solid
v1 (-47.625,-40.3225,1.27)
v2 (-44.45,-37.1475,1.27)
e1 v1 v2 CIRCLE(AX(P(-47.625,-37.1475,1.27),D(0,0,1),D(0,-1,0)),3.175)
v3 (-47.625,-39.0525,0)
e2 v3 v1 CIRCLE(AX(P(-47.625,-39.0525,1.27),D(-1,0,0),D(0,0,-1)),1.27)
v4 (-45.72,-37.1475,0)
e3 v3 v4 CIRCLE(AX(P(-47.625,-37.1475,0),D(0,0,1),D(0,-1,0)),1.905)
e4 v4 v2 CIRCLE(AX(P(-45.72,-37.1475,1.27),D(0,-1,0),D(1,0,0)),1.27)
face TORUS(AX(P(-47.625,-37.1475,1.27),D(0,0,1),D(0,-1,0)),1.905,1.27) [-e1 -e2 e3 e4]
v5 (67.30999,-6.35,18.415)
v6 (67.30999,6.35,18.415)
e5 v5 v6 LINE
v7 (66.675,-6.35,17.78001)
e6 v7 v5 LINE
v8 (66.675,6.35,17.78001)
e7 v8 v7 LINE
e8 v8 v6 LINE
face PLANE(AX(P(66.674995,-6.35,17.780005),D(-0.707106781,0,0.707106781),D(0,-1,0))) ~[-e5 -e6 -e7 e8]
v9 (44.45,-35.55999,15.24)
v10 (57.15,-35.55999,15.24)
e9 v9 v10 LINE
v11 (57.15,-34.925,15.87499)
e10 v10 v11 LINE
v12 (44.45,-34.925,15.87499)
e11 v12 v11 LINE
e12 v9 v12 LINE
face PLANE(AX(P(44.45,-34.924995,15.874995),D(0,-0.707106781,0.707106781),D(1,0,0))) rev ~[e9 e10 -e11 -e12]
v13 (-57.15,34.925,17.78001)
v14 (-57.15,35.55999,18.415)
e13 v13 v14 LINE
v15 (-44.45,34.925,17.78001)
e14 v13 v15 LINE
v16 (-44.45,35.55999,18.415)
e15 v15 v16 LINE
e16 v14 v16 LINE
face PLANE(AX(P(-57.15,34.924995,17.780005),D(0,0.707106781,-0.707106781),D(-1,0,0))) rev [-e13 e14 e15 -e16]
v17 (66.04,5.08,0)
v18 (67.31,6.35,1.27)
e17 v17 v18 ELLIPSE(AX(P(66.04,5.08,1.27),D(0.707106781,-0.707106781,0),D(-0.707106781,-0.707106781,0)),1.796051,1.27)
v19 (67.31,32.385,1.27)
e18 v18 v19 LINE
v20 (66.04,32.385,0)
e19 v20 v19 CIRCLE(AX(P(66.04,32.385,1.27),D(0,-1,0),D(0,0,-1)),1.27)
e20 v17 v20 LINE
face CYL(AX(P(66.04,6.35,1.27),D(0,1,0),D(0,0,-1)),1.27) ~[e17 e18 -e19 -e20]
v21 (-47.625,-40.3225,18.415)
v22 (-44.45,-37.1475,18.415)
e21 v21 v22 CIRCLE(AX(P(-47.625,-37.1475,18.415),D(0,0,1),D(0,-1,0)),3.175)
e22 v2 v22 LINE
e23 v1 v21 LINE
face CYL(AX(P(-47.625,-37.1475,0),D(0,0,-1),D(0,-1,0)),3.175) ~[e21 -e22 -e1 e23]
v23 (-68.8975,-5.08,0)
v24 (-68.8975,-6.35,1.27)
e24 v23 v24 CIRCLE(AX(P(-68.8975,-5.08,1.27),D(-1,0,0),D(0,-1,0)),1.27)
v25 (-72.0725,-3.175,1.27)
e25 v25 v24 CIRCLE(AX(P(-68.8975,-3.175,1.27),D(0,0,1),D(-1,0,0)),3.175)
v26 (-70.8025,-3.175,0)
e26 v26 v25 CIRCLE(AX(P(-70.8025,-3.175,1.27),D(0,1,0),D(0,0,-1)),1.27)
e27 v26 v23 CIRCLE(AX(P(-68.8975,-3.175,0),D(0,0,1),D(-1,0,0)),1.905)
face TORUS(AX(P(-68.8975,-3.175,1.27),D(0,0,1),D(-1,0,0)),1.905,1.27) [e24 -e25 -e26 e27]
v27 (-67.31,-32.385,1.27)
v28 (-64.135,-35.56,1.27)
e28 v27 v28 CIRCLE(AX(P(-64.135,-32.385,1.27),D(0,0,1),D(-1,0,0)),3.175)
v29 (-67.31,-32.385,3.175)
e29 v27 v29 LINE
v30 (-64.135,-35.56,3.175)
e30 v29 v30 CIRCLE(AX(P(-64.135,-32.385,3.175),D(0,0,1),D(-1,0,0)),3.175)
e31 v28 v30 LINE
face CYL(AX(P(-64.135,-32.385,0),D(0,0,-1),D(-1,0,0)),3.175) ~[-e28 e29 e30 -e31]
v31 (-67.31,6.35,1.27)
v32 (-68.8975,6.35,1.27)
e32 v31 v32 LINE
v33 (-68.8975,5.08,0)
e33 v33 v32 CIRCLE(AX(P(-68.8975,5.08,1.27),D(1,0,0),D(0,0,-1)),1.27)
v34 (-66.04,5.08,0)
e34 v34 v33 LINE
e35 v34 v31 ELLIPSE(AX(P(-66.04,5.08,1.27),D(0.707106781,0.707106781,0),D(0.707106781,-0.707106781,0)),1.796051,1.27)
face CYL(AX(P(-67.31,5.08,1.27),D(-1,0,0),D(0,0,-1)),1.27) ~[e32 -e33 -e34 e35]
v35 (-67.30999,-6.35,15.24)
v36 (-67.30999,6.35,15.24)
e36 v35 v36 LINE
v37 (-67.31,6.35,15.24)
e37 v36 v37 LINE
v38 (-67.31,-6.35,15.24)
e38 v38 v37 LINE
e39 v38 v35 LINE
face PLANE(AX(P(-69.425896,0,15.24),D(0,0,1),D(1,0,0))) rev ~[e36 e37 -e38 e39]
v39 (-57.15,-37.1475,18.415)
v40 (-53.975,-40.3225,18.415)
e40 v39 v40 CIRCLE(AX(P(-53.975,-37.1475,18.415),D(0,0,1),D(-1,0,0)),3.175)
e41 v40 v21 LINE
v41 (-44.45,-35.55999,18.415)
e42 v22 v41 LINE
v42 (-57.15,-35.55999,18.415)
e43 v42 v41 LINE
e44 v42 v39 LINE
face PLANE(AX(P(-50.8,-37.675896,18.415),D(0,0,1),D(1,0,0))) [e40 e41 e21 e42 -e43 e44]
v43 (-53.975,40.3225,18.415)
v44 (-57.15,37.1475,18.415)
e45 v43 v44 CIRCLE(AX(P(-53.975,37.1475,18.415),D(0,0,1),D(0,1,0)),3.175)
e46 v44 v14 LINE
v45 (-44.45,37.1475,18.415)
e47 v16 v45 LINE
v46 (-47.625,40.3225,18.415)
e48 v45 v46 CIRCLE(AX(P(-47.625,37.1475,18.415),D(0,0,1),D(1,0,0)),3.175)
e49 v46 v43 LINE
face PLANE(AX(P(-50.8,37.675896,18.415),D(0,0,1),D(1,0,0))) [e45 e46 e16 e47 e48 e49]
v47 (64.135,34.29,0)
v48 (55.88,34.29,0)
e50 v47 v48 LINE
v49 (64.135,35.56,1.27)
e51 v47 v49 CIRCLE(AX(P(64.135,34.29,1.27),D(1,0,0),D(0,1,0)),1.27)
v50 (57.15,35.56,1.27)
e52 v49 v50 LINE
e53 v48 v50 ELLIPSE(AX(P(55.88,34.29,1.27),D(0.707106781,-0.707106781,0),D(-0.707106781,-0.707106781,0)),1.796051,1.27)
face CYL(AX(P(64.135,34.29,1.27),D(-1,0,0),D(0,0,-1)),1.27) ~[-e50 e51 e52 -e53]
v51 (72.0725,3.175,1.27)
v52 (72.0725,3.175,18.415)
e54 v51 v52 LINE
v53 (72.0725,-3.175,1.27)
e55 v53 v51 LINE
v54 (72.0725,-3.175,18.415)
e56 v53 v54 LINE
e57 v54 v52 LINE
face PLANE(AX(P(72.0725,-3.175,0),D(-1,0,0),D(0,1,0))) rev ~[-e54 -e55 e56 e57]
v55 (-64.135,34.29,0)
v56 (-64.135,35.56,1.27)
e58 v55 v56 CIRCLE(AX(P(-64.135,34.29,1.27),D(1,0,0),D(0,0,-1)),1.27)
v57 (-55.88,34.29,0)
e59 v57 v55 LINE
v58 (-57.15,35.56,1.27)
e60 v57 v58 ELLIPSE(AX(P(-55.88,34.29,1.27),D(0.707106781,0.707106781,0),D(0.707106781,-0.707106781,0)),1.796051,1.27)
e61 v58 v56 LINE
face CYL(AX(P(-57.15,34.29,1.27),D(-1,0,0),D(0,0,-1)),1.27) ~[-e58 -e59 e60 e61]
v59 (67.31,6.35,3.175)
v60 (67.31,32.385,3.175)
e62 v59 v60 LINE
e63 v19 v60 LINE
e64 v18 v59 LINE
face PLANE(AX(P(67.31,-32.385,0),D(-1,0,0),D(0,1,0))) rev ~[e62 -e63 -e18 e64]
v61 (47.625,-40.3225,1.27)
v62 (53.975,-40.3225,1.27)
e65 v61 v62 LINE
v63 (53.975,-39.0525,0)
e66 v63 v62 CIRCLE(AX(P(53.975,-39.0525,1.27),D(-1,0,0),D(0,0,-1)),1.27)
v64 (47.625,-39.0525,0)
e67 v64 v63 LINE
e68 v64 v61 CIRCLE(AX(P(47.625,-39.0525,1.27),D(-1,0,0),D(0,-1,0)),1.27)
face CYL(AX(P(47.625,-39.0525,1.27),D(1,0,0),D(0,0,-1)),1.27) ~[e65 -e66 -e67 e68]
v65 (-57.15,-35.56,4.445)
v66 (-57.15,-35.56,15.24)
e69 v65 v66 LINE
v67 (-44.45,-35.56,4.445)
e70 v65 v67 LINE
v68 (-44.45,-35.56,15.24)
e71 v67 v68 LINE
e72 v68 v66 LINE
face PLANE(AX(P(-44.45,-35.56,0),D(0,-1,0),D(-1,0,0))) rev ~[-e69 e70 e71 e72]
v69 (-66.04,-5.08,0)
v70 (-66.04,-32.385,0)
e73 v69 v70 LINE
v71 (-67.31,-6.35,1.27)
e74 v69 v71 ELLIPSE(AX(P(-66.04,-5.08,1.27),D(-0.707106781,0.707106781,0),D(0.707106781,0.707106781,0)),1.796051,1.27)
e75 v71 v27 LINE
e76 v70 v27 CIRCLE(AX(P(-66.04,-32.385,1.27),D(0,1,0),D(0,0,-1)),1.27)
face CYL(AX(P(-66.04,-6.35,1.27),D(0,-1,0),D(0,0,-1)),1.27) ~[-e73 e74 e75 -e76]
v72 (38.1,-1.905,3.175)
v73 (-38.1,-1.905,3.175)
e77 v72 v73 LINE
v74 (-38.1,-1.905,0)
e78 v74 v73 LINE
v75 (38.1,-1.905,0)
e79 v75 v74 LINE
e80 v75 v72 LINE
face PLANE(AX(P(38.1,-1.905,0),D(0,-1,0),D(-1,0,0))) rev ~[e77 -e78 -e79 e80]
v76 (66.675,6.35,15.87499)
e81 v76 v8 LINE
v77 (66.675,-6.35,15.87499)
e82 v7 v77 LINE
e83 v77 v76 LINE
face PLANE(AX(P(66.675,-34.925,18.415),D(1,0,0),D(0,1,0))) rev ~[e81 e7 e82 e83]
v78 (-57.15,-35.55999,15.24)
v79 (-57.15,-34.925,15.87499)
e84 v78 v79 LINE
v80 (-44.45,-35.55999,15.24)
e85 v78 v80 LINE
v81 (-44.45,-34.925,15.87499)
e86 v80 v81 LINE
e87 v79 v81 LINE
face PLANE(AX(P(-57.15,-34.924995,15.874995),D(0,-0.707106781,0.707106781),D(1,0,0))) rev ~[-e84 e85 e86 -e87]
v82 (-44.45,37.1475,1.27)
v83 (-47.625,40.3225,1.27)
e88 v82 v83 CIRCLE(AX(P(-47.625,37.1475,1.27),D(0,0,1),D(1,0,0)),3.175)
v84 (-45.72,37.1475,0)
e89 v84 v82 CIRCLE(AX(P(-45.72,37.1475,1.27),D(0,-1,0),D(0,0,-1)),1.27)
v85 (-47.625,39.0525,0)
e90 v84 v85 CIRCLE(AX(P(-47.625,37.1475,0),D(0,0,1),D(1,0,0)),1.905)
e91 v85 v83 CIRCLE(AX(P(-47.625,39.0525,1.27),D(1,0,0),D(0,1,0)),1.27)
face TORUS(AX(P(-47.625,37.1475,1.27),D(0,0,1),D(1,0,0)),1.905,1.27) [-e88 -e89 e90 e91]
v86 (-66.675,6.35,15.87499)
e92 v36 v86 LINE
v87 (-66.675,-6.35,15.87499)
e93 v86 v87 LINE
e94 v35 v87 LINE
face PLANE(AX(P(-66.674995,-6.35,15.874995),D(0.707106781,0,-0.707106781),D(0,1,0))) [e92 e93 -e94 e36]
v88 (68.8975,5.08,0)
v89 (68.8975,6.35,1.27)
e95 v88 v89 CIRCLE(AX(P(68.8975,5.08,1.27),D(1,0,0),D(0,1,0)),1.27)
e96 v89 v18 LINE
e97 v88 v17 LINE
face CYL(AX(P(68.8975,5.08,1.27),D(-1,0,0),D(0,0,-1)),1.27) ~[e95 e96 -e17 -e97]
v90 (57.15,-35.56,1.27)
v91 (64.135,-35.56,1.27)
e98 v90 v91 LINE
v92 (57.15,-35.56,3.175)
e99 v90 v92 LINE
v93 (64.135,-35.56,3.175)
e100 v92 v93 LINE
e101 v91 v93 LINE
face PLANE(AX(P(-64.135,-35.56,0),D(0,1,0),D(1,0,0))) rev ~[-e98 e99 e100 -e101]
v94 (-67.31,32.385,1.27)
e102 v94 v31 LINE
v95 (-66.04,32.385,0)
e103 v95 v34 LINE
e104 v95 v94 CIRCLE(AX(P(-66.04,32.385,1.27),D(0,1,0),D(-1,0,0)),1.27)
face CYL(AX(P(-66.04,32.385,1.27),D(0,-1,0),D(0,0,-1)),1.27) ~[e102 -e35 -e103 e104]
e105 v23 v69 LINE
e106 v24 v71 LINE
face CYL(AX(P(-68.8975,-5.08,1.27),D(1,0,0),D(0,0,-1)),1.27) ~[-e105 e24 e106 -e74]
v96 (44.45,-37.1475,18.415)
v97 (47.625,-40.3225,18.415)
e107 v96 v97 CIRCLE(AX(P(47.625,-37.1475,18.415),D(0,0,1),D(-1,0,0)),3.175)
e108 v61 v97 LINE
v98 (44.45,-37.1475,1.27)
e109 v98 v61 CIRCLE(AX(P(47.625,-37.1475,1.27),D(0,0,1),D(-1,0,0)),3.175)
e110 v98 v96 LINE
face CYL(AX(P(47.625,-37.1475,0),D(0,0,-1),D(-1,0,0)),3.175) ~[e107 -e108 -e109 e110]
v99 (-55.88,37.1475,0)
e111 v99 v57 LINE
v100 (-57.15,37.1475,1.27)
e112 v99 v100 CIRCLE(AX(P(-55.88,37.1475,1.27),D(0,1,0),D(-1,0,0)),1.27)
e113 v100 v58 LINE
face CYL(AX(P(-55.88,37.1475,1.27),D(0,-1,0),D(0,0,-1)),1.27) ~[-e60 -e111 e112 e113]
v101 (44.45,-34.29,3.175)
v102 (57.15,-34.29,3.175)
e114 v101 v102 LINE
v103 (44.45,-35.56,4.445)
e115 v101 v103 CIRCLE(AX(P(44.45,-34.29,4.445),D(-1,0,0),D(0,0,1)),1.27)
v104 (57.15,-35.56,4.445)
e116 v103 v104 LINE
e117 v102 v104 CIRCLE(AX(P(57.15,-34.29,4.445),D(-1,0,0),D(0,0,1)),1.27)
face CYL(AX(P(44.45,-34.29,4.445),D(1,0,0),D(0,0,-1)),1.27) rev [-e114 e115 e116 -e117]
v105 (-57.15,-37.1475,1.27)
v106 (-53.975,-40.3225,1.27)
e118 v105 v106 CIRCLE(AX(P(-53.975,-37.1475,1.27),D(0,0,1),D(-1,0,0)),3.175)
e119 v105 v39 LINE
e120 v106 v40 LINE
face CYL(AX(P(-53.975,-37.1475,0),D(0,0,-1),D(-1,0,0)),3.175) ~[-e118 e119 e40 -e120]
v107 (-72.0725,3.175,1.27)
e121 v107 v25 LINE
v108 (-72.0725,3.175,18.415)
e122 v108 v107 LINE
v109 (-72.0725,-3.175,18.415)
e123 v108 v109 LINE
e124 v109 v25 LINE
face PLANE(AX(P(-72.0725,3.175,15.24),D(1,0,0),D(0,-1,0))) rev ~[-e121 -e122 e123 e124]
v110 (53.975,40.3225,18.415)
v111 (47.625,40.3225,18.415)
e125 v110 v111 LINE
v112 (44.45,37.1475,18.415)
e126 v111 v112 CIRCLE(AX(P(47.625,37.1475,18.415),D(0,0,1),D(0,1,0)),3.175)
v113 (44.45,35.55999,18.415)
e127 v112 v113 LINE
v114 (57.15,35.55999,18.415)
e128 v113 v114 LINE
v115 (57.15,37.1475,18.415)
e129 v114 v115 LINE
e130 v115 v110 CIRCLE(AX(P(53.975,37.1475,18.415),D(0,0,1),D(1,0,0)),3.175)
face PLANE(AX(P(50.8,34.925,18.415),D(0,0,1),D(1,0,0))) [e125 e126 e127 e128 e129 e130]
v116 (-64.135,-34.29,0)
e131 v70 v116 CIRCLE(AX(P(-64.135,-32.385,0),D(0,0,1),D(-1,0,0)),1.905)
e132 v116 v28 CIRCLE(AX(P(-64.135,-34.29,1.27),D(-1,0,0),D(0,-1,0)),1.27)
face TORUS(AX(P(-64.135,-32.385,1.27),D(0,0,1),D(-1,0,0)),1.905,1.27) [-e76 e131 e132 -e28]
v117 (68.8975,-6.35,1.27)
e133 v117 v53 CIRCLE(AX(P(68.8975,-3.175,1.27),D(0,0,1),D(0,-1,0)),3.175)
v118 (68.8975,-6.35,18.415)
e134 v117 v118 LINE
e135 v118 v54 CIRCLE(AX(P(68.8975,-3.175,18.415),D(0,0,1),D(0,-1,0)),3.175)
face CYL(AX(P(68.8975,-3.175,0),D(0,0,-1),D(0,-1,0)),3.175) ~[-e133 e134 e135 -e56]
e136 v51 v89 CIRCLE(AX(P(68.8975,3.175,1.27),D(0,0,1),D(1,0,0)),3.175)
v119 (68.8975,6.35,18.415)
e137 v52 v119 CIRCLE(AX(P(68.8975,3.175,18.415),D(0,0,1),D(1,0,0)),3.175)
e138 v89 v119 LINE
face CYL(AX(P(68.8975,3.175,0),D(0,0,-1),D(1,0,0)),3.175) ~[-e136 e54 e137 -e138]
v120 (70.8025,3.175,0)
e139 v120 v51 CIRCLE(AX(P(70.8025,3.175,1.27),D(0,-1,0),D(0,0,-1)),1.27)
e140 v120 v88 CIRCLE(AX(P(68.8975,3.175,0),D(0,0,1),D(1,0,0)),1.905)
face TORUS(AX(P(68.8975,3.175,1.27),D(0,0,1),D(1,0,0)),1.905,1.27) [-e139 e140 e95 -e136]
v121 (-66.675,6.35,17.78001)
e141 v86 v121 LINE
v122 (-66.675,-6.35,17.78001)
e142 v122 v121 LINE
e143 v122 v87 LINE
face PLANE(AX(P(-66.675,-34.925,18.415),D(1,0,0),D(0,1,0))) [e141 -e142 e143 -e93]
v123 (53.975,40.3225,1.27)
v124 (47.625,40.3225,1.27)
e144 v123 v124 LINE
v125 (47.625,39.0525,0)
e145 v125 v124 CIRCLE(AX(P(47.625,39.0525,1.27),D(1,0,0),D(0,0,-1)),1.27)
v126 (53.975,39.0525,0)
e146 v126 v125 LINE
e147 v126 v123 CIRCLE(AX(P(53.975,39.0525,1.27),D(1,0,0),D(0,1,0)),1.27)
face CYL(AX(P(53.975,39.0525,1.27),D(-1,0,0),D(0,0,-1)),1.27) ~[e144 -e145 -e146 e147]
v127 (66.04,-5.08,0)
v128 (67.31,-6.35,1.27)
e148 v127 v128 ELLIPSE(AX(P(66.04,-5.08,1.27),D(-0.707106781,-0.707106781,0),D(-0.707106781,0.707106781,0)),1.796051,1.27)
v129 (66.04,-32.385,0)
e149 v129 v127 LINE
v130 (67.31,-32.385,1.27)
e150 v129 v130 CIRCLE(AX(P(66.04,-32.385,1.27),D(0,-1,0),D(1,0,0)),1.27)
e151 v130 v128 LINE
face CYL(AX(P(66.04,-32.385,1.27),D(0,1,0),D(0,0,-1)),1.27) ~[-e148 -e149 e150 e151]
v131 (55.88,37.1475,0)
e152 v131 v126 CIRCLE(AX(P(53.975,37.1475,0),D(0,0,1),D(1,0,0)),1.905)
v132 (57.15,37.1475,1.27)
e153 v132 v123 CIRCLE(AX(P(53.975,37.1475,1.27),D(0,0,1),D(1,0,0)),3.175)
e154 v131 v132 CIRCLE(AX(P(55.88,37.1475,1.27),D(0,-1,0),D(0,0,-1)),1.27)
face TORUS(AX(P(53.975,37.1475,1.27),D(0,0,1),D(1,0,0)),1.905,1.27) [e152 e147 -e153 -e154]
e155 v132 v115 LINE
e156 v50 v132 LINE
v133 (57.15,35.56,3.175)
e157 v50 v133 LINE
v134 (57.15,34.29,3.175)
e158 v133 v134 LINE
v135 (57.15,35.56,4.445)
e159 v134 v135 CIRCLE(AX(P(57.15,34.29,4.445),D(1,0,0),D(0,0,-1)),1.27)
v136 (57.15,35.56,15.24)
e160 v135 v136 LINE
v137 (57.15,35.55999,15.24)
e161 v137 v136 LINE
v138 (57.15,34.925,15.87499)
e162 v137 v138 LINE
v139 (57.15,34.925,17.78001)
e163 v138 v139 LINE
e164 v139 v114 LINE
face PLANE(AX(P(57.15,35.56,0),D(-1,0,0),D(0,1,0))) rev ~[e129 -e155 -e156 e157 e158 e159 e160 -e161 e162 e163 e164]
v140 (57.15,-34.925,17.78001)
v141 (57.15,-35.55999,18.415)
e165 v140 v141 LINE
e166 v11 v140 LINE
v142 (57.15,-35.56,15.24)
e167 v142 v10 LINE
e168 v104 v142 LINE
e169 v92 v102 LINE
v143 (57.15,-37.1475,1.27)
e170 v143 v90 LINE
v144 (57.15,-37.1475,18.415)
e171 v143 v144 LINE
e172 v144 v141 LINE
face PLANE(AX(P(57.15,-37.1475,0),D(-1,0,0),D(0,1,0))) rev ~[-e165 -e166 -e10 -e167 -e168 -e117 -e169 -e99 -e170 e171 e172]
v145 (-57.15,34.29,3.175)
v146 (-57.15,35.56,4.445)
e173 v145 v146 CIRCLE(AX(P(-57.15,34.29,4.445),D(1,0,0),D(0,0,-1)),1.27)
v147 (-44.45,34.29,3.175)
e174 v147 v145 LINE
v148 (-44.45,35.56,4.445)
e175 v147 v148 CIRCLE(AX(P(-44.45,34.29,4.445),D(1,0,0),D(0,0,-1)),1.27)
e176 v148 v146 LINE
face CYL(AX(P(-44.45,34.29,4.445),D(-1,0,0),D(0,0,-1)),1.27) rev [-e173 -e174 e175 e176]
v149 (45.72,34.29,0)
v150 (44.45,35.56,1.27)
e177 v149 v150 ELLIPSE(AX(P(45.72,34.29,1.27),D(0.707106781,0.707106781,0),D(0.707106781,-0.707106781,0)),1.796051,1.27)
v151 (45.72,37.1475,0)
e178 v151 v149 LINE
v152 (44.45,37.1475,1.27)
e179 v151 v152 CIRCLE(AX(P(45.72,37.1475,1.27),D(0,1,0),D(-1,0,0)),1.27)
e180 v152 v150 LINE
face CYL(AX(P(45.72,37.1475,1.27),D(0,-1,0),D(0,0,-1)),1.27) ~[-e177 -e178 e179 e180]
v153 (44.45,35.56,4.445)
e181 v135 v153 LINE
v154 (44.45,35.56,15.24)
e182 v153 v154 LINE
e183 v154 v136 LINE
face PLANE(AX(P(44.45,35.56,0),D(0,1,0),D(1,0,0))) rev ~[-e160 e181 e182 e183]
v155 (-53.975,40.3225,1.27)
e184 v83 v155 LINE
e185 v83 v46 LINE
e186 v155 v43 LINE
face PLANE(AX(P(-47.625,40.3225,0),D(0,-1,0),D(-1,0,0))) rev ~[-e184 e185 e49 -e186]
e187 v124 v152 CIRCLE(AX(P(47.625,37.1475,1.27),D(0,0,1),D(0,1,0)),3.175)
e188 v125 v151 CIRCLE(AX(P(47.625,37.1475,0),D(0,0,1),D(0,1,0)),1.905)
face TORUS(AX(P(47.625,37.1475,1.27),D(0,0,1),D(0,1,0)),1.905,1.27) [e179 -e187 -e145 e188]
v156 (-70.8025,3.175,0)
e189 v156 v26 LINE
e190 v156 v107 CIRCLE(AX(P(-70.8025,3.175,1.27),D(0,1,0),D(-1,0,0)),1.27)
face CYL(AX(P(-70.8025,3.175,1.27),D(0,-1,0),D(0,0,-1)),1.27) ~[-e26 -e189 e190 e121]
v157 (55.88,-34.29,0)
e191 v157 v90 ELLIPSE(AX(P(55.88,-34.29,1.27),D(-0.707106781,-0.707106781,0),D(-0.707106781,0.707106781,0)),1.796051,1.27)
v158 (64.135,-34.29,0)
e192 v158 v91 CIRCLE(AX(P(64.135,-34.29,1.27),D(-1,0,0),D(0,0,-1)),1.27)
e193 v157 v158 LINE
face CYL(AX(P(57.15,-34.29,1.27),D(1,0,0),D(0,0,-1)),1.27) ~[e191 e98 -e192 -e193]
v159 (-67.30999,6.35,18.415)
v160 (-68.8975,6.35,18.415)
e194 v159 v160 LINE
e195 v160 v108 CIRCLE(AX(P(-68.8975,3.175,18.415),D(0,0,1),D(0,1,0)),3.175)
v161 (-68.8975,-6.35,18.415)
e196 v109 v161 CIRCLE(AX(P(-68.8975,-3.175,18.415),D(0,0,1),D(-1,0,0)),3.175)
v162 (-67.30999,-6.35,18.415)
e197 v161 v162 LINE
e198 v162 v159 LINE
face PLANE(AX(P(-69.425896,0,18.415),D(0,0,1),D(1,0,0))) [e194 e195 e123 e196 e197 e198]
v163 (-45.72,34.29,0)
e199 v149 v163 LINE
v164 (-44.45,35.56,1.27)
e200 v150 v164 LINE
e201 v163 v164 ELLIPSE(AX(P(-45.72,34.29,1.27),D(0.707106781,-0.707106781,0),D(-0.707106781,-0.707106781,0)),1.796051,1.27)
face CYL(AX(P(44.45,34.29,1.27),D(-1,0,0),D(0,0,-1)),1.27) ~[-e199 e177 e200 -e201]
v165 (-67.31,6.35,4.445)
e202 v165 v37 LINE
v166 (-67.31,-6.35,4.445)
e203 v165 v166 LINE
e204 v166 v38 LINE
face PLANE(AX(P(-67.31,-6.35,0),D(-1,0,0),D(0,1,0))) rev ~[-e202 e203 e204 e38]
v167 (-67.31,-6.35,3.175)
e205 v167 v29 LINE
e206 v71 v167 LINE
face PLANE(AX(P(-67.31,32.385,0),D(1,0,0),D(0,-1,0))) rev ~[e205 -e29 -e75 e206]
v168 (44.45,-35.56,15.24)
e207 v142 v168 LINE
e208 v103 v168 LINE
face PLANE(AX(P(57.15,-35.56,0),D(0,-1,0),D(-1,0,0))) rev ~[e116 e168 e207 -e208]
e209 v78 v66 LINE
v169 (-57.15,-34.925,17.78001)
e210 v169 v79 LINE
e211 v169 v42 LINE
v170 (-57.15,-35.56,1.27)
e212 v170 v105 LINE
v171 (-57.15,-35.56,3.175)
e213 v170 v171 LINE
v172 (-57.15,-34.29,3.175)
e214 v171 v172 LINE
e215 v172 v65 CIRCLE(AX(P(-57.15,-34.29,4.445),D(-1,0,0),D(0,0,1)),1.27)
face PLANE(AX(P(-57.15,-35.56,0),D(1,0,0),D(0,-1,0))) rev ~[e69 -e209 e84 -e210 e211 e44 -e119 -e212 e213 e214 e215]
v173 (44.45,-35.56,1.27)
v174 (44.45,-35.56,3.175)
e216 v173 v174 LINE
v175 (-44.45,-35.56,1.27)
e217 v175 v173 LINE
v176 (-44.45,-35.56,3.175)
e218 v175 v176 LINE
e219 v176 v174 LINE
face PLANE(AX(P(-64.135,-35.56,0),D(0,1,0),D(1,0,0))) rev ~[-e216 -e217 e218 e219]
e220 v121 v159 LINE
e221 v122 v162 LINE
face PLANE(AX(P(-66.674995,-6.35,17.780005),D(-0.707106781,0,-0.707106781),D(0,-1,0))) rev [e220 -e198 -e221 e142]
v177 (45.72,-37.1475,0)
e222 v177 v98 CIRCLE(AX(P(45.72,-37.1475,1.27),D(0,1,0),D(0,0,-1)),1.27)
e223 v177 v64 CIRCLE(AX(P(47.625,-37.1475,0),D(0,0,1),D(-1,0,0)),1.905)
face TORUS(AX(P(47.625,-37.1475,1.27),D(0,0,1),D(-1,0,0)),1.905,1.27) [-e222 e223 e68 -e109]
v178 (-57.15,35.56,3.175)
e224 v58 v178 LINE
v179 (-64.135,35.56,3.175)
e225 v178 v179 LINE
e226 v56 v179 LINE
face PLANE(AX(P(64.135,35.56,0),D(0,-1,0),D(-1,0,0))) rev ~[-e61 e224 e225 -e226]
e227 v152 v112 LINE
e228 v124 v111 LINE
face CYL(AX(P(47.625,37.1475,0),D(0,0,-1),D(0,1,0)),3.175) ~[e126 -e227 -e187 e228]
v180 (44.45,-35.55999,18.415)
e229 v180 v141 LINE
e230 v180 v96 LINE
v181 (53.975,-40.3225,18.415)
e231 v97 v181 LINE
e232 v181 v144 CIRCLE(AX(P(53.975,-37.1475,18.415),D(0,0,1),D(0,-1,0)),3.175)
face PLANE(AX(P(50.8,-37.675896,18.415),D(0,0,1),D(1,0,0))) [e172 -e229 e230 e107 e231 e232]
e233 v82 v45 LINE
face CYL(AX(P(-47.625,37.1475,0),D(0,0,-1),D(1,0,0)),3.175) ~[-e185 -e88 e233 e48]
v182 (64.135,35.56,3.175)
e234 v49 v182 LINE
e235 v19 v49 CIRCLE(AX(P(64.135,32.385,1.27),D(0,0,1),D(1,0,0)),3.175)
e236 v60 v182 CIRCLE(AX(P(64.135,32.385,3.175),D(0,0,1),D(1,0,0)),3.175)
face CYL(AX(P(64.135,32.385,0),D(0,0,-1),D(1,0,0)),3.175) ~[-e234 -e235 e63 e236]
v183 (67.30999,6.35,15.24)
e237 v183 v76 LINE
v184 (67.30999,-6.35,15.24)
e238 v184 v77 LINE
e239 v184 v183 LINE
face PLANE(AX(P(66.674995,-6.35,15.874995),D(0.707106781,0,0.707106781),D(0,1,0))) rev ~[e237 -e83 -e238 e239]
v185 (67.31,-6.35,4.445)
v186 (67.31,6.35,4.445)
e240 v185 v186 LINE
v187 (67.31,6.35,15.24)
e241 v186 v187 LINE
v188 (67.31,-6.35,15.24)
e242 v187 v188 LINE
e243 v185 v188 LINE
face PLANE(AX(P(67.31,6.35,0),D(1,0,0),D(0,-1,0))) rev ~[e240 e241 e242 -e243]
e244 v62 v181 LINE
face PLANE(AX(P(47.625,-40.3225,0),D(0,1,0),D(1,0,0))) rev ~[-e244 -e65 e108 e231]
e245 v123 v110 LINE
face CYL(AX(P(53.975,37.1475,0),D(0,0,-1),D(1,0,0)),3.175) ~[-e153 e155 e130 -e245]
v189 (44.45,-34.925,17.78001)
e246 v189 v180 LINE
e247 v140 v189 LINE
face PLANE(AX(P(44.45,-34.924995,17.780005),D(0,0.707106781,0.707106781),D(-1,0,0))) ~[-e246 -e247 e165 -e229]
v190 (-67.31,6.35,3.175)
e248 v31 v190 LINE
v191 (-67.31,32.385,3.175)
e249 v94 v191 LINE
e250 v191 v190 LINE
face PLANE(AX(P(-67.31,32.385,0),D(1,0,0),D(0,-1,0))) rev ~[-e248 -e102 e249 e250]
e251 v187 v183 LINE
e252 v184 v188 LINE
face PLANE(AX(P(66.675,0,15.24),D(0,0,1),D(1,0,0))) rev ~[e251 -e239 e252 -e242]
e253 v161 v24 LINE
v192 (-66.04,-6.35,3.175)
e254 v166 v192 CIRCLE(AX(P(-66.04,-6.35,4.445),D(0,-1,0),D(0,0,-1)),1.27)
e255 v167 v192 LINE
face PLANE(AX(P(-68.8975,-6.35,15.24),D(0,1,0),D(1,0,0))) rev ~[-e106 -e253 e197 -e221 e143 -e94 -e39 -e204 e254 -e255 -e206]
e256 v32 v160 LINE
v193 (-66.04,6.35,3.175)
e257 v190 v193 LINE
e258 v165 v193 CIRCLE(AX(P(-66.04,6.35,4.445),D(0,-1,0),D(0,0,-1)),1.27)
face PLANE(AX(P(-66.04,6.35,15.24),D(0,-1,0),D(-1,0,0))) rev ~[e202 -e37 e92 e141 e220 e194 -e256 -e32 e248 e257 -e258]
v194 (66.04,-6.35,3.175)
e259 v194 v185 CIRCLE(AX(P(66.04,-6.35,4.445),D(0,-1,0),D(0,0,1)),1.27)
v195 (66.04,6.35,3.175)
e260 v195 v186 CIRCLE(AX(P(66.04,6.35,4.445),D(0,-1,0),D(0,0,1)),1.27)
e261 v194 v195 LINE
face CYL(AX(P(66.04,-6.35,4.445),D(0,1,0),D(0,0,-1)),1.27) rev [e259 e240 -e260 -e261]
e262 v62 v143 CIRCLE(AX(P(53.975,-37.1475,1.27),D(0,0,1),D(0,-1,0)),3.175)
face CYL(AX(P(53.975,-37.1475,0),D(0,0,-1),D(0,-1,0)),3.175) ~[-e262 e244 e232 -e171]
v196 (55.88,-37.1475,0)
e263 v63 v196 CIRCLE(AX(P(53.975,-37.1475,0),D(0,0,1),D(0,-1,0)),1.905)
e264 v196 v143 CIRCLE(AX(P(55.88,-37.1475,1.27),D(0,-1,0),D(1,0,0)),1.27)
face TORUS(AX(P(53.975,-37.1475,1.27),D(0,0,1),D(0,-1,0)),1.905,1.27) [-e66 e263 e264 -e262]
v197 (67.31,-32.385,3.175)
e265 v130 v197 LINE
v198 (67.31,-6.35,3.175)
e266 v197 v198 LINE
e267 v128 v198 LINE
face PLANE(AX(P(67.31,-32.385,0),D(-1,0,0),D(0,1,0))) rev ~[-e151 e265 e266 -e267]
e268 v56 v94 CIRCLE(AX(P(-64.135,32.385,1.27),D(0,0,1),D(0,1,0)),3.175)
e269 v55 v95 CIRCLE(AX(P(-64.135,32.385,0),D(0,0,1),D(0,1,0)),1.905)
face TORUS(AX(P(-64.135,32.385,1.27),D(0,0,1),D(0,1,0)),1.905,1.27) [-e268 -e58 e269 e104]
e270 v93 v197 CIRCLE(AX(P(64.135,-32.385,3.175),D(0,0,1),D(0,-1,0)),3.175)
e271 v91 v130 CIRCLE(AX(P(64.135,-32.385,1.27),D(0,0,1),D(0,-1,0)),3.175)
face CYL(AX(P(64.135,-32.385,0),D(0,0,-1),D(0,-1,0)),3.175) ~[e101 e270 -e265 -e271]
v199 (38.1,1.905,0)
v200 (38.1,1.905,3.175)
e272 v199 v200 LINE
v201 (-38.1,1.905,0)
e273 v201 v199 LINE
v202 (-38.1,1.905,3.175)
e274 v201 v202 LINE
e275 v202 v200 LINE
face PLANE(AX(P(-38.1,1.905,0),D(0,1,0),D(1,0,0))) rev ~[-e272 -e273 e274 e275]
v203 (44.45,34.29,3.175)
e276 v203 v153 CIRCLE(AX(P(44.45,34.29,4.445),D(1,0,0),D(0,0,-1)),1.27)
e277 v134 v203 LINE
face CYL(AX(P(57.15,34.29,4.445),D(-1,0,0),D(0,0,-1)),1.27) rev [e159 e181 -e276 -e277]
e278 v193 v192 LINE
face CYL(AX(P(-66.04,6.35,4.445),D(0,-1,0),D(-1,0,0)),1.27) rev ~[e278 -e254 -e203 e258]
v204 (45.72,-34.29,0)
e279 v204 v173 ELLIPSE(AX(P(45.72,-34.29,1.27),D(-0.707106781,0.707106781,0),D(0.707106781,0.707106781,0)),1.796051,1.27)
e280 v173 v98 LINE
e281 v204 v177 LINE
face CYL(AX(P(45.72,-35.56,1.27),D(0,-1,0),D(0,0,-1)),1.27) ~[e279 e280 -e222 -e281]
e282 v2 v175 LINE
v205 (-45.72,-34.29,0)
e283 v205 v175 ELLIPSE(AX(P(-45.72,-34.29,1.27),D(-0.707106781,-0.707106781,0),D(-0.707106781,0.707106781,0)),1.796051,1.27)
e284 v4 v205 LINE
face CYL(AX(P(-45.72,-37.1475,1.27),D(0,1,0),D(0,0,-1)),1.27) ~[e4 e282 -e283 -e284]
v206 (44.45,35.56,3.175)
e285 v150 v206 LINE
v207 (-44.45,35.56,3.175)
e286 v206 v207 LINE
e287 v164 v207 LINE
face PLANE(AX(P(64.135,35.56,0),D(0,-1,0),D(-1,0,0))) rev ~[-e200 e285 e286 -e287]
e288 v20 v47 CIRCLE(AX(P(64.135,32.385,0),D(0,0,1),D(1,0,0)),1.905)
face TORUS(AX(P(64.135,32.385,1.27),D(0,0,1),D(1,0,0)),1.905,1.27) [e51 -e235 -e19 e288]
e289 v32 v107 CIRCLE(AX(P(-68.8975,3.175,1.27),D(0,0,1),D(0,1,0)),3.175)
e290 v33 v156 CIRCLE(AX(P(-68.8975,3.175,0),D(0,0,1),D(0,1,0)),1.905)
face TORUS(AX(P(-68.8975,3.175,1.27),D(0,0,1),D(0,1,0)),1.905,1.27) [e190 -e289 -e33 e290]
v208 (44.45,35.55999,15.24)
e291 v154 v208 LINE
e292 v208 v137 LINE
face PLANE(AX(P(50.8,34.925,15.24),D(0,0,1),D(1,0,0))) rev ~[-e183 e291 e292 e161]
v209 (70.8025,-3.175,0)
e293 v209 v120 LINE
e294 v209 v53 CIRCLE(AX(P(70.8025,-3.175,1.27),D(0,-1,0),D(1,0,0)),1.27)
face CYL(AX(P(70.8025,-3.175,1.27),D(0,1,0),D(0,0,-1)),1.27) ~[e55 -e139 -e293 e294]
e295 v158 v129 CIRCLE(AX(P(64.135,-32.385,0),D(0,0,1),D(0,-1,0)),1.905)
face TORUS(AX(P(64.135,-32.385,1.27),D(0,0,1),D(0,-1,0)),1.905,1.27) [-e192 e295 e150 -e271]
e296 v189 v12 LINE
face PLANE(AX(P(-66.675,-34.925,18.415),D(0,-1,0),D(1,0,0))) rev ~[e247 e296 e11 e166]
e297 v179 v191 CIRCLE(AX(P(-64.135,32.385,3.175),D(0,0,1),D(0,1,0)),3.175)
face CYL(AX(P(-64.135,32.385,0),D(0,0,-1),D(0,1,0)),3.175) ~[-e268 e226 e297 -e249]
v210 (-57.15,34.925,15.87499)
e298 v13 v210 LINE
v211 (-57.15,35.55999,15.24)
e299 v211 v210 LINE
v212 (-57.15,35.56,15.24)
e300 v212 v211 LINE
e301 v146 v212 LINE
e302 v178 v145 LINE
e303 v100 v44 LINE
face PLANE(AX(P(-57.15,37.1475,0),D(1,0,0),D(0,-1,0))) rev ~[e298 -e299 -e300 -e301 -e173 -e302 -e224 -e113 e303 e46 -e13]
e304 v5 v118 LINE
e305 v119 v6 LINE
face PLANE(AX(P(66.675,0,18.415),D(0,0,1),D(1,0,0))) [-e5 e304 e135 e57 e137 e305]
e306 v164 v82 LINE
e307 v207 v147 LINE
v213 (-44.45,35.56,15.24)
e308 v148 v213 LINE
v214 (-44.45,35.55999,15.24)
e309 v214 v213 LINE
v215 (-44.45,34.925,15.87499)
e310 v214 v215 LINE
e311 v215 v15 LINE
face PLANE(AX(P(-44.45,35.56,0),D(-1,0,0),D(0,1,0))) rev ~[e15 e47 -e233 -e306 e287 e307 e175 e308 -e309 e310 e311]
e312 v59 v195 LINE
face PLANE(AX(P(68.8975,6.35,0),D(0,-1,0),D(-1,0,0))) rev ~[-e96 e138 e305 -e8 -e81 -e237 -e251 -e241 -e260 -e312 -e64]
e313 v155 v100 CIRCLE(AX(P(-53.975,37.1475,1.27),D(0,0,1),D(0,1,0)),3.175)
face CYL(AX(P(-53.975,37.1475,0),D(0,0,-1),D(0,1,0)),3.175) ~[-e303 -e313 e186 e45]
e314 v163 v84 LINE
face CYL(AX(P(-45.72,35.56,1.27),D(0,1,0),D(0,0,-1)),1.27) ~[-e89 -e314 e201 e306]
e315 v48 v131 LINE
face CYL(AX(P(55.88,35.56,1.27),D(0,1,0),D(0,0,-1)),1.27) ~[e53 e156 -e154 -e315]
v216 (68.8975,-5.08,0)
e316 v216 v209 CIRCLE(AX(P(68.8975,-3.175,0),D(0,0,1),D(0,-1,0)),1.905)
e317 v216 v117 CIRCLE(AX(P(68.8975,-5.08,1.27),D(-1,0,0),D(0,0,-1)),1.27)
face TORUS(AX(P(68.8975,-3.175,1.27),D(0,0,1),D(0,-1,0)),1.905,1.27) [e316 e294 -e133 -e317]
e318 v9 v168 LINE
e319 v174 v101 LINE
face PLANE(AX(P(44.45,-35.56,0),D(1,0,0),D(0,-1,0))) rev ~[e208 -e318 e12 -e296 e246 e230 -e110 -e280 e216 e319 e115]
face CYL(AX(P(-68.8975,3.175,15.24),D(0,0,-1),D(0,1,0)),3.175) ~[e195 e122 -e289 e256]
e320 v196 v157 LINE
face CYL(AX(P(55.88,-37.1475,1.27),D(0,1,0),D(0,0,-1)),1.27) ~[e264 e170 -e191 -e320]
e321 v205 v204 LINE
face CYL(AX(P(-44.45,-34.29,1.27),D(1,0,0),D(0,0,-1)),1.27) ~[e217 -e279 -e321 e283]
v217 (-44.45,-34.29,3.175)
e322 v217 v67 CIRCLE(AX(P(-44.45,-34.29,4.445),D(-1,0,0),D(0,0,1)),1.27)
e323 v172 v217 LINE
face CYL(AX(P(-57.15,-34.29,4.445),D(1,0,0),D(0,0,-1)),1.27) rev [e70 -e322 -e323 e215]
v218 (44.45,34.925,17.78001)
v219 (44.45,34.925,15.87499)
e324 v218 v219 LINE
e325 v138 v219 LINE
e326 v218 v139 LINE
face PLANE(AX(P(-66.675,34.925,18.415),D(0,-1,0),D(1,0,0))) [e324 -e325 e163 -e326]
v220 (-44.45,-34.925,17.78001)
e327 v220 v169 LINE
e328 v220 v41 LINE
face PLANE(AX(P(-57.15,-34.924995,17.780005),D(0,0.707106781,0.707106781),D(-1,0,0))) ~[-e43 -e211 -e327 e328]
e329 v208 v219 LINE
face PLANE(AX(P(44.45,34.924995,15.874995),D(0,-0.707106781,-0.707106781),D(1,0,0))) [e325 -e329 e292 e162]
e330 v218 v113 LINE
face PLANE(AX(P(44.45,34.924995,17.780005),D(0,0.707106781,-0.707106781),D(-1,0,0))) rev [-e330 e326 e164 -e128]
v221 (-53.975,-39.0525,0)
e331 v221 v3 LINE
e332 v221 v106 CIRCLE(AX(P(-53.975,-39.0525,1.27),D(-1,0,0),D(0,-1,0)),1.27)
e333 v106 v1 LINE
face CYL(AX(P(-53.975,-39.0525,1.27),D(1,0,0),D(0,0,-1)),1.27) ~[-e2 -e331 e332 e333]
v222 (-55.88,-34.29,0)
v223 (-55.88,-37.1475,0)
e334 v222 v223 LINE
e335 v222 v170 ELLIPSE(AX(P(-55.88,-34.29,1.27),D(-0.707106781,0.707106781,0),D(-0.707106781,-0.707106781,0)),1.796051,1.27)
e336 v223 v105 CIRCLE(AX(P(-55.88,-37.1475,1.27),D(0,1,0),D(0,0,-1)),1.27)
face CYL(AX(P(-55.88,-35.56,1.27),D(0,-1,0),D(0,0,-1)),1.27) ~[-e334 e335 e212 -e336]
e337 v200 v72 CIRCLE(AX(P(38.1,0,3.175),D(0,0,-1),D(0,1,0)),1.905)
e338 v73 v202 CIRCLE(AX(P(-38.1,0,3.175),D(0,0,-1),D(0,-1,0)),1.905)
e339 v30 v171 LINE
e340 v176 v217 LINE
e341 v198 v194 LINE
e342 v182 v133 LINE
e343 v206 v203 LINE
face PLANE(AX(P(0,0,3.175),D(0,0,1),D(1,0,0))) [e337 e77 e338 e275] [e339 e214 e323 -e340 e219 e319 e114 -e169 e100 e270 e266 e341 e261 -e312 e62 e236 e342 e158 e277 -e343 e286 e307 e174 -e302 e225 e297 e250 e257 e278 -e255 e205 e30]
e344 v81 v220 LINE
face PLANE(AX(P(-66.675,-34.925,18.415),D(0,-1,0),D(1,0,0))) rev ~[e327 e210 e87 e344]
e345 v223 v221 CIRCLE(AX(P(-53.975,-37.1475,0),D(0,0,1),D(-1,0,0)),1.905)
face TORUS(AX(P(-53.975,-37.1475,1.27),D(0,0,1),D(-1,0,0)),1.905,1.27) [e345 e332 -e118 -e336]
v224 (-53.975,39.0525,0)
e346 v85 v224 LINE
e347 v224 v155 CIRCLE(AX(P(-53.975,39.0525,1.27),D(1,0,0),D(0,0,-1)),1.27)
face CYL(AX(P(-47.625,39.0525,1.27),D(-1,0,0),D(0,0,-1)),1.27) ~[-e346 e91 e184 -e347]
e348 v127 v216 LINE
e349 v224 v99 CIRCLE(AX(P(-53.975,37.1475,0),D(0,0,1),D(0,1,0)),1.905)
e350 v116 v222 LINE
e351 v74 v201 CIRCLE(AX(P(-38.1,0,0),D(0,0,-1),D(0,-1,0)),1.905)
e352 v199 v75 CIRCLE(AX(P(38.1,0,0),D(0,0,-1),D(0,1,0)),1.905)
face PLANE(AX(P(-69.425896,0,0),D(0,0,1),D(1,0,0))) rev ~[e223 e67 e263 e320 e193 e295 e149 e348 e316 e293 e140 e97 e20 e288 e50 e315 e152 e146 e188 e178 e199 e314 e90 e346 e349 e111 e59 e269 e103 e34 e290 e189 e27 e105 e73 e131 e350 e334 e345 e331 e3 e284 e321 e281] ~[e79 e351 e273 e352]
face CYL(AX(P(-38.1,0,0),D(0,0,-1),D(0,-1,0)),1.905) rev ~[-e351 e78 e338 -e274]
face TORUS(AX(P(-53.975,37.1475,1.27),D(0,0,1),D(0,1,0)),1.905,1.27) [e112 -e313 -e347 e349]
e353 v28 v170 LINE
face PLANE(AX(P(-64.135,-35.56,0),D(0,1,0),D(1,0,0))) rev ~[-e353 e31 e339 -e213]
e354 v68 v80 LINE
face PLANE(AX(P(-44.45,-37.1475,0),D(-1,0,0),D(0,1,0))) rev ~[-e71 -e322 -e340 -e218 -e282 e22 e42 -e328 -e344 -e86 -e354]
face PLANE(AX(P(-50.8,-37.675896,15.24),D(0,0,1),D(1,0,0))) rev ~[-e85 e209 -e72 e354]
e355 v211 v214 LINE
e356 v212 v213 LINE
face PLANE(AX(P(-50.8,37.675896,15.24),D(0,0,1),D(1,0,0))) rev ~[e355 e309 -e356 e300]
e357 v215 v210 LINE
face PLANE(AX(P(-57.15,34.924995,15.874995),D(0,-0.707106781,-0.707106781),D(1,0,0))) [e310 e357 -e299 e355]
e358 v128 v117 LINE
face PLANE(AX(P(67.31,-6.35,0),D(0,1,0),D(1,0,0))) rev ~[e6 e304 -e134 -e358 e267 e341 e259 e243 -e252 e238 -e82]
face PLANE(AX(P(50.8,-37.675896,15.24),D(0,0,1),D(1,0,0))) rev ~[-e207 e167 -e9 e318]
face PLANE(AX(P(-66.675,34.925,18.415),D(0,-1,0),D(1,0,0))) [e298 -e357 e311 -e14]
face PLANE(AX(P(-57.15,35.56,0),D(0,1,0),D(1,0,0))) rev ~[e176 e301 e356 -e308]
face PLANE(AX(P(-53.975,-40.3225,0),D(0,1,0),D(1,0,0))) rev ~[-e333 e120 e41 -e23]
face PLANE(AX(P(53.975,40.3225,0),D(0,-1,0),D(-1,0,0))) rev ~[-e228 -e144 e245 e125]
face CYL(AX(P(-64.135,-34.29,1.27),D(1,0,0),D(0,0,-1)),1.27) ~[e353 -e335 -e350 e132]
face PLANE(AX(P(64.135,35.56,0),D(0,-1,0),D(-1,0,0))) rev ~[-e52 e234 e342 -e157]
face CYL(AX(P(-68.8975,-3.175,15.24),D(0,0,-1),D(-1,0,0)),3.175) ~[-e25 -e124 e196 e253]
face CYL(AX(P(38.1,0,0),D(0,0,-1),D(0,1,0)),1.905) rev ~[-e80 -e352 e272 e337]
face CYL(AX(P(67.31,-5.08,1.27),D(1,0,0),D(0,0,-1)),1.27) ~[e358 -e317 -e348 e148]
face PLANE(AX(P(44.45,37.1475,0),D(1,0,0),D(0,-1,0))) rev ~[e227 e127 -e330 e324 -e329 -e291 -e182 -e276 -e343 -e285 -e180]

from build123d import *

# Parameters (mm, degrees)
F1_DEPTH = 3.175
F3_DEPTH = 15.24
F4_W     = 1.27
F4_H     = 12.7
F4_W_2   = 12.7
F4_H_2   = 1.27
F5_DEPTH = 3.175
F6_SIZE  = 1.26999
F8_W     = 133.35
F8_H     = 69.85
F9_DEPTH = 6.35
F10_R    = 1.27
F11_R    = 1.27


# Not quite as in the source:
# - a fillet or chamfer is up to 0.001 mm smaller than in the source, because OpenCascade refuses the exact size


with BuildPart() as f1:
    # F0 (on Top) → F1 (new body)
    with BuildSketch(Plane.XY):
        with BuildLine():
            ThreePointArc((67.31, 32.385), (66.3800640303, 34.6300640303), (64.135, 35.56))
            Line((64.135, 35.56), (-64.135, 35.56))
            ThreePointArc((-64.135, 35.56), (-66.3800640303, 34.6300640303), (-67.31, 32.385))
            Line((-67.31, 32.385), (-67.31, -32.385))
            ThreePointArc((-67.31, -32.385), (-66.3800640303, -34.6300640303), (-64.135, -35.56))
            Line((-64.135, -35.56), (64.135, -35.56))
            ThreePointArc((64.135, -35.56), (66.3800640303, -34.6300640303), (67.31, -32.385))
            Line((67.31, -32.385), (67.31, 32.385))
        make_face()
        with BuildLine():
            Line((38.1, -1.905), (-38.1, -1.905))
            ThreePointArc((-38.1, -1.905), (-40.005, 0), (-38.1, 1.905))
            Line((-38.1, 1.905), (38.1, 1.905))
            ThreePointArc((38.1, 1.905), (40.005, 0), (38.1, -1.905))
        make_face(mode=Mode.SUBTRACT)
    extrude(amount=F1_DEPTH)

    # F2 (on Top) → F3 (join)
    with BuildSketch(Plane.XY):
        with BuildLine():
            Line((-67.31, -6.35), (-67.31, 6.35))
            Line((-67.31, 6.35), (-68.8975, 6.35))
            ThreePointArc((-68.8975, 6.35), (-71.1425640303, 5.4200640303), (-72.0725, 3.175))
            Line((-72.0725, 3.175), (-72.0725, -3.175))
            ThreePointArc((-72.0725, -3.175), (-71.1425640303, -5.4200640303), (-68.8975, -6.35))
            Line((-68.8975, -6.35), (-67.31, -6.35))
        make_face()
        with BuildLine():
            Line((-44.45, -37.1475), (-44.45, -35.56))
            Line((-44.45, -35.56), (-57.15, -35.56))
            Line((-57.15, -35.56), (-57.15, -37.1475))
            ThreePointArc((-57.15, -37.1475), (-56.2200640303, -39.3925640303), (-53.975, -40.3225))
            Line((-53.975, -40.3225), (-47.625, -40.3225))
            ThreePointArc((-47.625, -40.3225), (-45.3799359697, -39.3925640303), (-44.45, -37.1475))
        make_face()
        with BuildLine():
            Line((-57.15, 35.56), (-44.45, 35.56))
            Line((-44.45, 35.56), (-44.45, 37.1475))
            ThreePointArc((-44.45, 37.1475), (-45.3799359697, 39.3925640303), (-47.625, 40.3225))
            Line((-47.625, 40.3225), (-53.975, 40.3225))
            ThreePointArc((-53.975, 40.3225), (-56.2200640303, 39.3925640303), (-57.15, 37.1475))
            Line((-57.15, 37.1475), (-57.15, 35.56))
        make_face()
        with BuildLine():
            Line((57.15, -35.56), (44.45, -35.56))
            Line((44.45, -35.56), (44.45, -37.1475))
            ThreePointArc((44.45, -37.1475), (45.3799359697, -39.3925640303), (47.625, -40.3225))
            Line((47.625, -40.3225), (53.975, -40.3225))
            ThreePointArc((53.975, -40.3225), (56.2200640303, -39.3925640303), (57.15, -37.1475))
            Line((57.15, -37.1475), (57.15, -35.56))
        make_face()
        with BuildLine():
            Line((67.31, 6.35), (67.31, -6.35))
            Line((67.31, -6.35), (68.8975, -6.35))
            ThreePointArc((68.8975, -6.35), (71.1425640303, -5.4200640303), (72.0725, -3.175))
            Line((72.0725, -3.175), (72.0725, 3.175))
            ThreePointArc((72.0725, 3.175), (71.1425640303, 5.4200640303), (68.8975, 6.35))
            Line((68.8975, 6.35), (67.31, 6.35))
        make_face()
        with BuildLine():
            Line((44.45, 35.56), (57.15, 35.56))
            Line((57.15, 35.56), (57.15, 37.1475))
            ThreePointArc((57.15, 37.1475), (56.2200640303, 39.3925640303), (53.975, 40.3225))
            Line((53.975, 40.3225), (47.625, 40.3225))
            ThreePointArc((47.625, 40.3225), (45.3799359697, 39.3925640303), (44.45, 37.1475))
            Line((44.45, 37.1475), (44.45, 35.56))
        make_face()
    extrude(amount=F3_DEPTH)

    # F4 (on face) → F5 (join)
    with BuildSketch(Plane.XY.offset(15.24)):
        with BuildLine():
            Line((-68.8975, -6.35), (-67.31, -6.35))
            Line((-67.31, -6.35), (-67.31, 6.35))
            Line((-67.31, 6.35), (-68.8975, 6.35))
            ThreePointArc((-68.8975, 6.35), (-71.1425640303, 5.4200640303), (-72.0725, 3.175))
            Line((-72.0725, 3.175), (-72.0725, -3.175))
            ThreePointArc((-72.0725, -3.175), (-71.1425640303, -5.4200640303), (-68.8975, -6.35))
        make_face()
        with Locations((-66.675, 0)):
            Rectangle(F4_W, F4_H)
        with BuildLine():
            Line((-44.45, -35.56), (-57.15, -35.56))
            Line((-57.15, -35.56), (-57.15, -37.1475))
            ThreePointArc((-57.15, -37.1475), (-56.2200640303, -39.3925640303), (-53.975, -40.3225))
            Line((-53.975, -40.3225), (-47.625, -40.3225))
            ThreePointArc((-47.625, -40.3225), (-45.3799359697, -39.3925640303), (-44.45, -37.1475))
            Line((-44.45, -37.1475), (-44.45, -35.56))
        make_face()
        with Locations((-50.8, -34.925)):
            Rectangle(F4_W_2, F4_H_2)
        with BuildLine():
            Line((-57.15, 37.1475), (-57.15, 35.56))
            Line((-57.15, 35.56), (-44.45, 35.56))
            Line((-44.45, 35.56), (-44.45, 37.1475))
            ThreePointArc((-44.45, 37.1475), (-45.3799359697, 39.3925640303), (-47.625, 40.3225))
            Line((-47.625, 40.3225), (-53.975, 40.3225))
            ThreePointArc((-53.975, 40.3225), (-56.2200640303, 39.3925640303), (-57.15, 37.1475))
        make_face()
        with Locations((-50.8, 34.925)):
            Rectangle(F4_W_2, F4_H_2)
        with Locations((50.8, 34.925)):
            Rectangle(F4_W_2, F4_H_2)
        with BuildLine():
            Line((44.45, 35.56), (57.15, 35.56))
            Line((57.15, 35.56), (57.15, 37.1475))
            ThreePointArc((57.15, 37.1475), (56.2200640303, 39.3925640303), (53.975, 40.3225))
            Line((53.975, 40.3225), (47.625, 40.3225))
            ThreePointArc((47.625, 40.3225), (45.3799359697, 39.3925640303), (44.45, 37.1475))
            Line((44.45, 37.1475), (44.45, 35.56))
        make_face()
        with Locations((66.675, 0)):
            Rectangle(F4_W, F4_H)
        with BuildLine():
            Line((68.8975, 6.35), (67.31, 6.35))
            Line((67.31, 6.35), (67.31, -6.35))
            Line((67.31, -6.35), (68.8975, -6.35))
            ThreePointArc((68.8975, -6.35), (71.1425640303, -5.4200640303), (72.0725, -3.175))
            Line((72.0725, -3.175), (72.0725, 3.175))
            ThreePointArc((72.0725, 3.175), (71.1425640303, 5.4200640303), (68.8975, 6.35))
        make_face()
        with BuildLine():
            Line((57.15, -37.1475), (57.15, -35.56))
            Line((57.15, -35.56), (44.45, -35.56))
            Line((44.45, -35.56), (44.45, -37.1475))
            ThreePointArc((44.45, -37.1475), (45.3799359697, -39.3925640303), (47.625, -40.3225))
            Line((47.625, -40.3225), (53.975, -40.3225))
            ThreePointArc((53.975, -40.3225), (56.2200640303, -39.3925640303), (57.15, -37.1475))
        make_face()
        with Locations((50.8, -34.925)):
            Rectangle(F4_W_2, F4_H_2)
    extrude(amount=F5_DEPTH)

    # F6 (size 1.27 in the source; OpenCascade refuses exactly that, so slightly less here)
    f6_edges = [f1.edges().sort_by_distance(p)[0] for p in [
        (50.8, -34.29, 15.24),
        (50.8, -34.29, 18.415),
        (66.04, 0, 18.415),
        (50.8, 34.29, 18.415),
        (-50.8, -34.29, 18.415),
        (-66.04, 0, 18.415),
        (-50.8, 34.29, 18.415),
        (-66.04, 0, 15.24),
        (-50.8, -34.29, 15.24),
        (66.04, 0, 15.24),
        (50.8, 34.29, 15.24),
        (-50.8, 34.29, 15.24),
    ]]
    chamfer(f6_edges, length=F6_SIZE)

    # F8 (on face) → F9 (cut)
    with BuildSketch(Plane.XY.offset(18.415)):
        Rectangle(F8_W, F8_H)
    extrude(amount=-F9_DEPTH, mode=Mode.SUBTRACT)

    # F10
    f10_edges = [f1.edges().sort_by_distance(p)[0] for p in [
        (-50.8, -40.3225, 0),
        (-45.379936, -39.392564, 0),
        (-56.220064, -39.392564, 0),
        (0, -35.56, 0),
        (45.379936, -39.392564, 0),
        (56.220064, -39.392564, 0),
        (60.6425, -35.56, 0),
        (71.142564, -5.420064, 0),
        (67.31, 19.3675, 0),
        (56.220064, 39.392564, 0),
        (0, 35.56, 0),
        (-50.8, 40.3225, 0),
        (-60.6425, 35.56, 0),
        (-71.142564, 5.420064, 0),
        (-67.31, -19.3675, 0),
    ]]
    fillet(f10_edges, radius=F10_R)

    # F11
    f11_edges = [f1.edges().sort_by_distance(p)[0] for p in [
        (67.31, 0, 3.175),
        (-50.8, -35.56, 3.175),
        (50.8, -35.56, 3.175),
        (-67.31, 0, 3.175),
        (50.8, 35.56, 3.175),
        (-50.8, 35.56, 3.175),
    ]]
    fillet(f11_edges, radius=F11_R)


solid = f1.part
